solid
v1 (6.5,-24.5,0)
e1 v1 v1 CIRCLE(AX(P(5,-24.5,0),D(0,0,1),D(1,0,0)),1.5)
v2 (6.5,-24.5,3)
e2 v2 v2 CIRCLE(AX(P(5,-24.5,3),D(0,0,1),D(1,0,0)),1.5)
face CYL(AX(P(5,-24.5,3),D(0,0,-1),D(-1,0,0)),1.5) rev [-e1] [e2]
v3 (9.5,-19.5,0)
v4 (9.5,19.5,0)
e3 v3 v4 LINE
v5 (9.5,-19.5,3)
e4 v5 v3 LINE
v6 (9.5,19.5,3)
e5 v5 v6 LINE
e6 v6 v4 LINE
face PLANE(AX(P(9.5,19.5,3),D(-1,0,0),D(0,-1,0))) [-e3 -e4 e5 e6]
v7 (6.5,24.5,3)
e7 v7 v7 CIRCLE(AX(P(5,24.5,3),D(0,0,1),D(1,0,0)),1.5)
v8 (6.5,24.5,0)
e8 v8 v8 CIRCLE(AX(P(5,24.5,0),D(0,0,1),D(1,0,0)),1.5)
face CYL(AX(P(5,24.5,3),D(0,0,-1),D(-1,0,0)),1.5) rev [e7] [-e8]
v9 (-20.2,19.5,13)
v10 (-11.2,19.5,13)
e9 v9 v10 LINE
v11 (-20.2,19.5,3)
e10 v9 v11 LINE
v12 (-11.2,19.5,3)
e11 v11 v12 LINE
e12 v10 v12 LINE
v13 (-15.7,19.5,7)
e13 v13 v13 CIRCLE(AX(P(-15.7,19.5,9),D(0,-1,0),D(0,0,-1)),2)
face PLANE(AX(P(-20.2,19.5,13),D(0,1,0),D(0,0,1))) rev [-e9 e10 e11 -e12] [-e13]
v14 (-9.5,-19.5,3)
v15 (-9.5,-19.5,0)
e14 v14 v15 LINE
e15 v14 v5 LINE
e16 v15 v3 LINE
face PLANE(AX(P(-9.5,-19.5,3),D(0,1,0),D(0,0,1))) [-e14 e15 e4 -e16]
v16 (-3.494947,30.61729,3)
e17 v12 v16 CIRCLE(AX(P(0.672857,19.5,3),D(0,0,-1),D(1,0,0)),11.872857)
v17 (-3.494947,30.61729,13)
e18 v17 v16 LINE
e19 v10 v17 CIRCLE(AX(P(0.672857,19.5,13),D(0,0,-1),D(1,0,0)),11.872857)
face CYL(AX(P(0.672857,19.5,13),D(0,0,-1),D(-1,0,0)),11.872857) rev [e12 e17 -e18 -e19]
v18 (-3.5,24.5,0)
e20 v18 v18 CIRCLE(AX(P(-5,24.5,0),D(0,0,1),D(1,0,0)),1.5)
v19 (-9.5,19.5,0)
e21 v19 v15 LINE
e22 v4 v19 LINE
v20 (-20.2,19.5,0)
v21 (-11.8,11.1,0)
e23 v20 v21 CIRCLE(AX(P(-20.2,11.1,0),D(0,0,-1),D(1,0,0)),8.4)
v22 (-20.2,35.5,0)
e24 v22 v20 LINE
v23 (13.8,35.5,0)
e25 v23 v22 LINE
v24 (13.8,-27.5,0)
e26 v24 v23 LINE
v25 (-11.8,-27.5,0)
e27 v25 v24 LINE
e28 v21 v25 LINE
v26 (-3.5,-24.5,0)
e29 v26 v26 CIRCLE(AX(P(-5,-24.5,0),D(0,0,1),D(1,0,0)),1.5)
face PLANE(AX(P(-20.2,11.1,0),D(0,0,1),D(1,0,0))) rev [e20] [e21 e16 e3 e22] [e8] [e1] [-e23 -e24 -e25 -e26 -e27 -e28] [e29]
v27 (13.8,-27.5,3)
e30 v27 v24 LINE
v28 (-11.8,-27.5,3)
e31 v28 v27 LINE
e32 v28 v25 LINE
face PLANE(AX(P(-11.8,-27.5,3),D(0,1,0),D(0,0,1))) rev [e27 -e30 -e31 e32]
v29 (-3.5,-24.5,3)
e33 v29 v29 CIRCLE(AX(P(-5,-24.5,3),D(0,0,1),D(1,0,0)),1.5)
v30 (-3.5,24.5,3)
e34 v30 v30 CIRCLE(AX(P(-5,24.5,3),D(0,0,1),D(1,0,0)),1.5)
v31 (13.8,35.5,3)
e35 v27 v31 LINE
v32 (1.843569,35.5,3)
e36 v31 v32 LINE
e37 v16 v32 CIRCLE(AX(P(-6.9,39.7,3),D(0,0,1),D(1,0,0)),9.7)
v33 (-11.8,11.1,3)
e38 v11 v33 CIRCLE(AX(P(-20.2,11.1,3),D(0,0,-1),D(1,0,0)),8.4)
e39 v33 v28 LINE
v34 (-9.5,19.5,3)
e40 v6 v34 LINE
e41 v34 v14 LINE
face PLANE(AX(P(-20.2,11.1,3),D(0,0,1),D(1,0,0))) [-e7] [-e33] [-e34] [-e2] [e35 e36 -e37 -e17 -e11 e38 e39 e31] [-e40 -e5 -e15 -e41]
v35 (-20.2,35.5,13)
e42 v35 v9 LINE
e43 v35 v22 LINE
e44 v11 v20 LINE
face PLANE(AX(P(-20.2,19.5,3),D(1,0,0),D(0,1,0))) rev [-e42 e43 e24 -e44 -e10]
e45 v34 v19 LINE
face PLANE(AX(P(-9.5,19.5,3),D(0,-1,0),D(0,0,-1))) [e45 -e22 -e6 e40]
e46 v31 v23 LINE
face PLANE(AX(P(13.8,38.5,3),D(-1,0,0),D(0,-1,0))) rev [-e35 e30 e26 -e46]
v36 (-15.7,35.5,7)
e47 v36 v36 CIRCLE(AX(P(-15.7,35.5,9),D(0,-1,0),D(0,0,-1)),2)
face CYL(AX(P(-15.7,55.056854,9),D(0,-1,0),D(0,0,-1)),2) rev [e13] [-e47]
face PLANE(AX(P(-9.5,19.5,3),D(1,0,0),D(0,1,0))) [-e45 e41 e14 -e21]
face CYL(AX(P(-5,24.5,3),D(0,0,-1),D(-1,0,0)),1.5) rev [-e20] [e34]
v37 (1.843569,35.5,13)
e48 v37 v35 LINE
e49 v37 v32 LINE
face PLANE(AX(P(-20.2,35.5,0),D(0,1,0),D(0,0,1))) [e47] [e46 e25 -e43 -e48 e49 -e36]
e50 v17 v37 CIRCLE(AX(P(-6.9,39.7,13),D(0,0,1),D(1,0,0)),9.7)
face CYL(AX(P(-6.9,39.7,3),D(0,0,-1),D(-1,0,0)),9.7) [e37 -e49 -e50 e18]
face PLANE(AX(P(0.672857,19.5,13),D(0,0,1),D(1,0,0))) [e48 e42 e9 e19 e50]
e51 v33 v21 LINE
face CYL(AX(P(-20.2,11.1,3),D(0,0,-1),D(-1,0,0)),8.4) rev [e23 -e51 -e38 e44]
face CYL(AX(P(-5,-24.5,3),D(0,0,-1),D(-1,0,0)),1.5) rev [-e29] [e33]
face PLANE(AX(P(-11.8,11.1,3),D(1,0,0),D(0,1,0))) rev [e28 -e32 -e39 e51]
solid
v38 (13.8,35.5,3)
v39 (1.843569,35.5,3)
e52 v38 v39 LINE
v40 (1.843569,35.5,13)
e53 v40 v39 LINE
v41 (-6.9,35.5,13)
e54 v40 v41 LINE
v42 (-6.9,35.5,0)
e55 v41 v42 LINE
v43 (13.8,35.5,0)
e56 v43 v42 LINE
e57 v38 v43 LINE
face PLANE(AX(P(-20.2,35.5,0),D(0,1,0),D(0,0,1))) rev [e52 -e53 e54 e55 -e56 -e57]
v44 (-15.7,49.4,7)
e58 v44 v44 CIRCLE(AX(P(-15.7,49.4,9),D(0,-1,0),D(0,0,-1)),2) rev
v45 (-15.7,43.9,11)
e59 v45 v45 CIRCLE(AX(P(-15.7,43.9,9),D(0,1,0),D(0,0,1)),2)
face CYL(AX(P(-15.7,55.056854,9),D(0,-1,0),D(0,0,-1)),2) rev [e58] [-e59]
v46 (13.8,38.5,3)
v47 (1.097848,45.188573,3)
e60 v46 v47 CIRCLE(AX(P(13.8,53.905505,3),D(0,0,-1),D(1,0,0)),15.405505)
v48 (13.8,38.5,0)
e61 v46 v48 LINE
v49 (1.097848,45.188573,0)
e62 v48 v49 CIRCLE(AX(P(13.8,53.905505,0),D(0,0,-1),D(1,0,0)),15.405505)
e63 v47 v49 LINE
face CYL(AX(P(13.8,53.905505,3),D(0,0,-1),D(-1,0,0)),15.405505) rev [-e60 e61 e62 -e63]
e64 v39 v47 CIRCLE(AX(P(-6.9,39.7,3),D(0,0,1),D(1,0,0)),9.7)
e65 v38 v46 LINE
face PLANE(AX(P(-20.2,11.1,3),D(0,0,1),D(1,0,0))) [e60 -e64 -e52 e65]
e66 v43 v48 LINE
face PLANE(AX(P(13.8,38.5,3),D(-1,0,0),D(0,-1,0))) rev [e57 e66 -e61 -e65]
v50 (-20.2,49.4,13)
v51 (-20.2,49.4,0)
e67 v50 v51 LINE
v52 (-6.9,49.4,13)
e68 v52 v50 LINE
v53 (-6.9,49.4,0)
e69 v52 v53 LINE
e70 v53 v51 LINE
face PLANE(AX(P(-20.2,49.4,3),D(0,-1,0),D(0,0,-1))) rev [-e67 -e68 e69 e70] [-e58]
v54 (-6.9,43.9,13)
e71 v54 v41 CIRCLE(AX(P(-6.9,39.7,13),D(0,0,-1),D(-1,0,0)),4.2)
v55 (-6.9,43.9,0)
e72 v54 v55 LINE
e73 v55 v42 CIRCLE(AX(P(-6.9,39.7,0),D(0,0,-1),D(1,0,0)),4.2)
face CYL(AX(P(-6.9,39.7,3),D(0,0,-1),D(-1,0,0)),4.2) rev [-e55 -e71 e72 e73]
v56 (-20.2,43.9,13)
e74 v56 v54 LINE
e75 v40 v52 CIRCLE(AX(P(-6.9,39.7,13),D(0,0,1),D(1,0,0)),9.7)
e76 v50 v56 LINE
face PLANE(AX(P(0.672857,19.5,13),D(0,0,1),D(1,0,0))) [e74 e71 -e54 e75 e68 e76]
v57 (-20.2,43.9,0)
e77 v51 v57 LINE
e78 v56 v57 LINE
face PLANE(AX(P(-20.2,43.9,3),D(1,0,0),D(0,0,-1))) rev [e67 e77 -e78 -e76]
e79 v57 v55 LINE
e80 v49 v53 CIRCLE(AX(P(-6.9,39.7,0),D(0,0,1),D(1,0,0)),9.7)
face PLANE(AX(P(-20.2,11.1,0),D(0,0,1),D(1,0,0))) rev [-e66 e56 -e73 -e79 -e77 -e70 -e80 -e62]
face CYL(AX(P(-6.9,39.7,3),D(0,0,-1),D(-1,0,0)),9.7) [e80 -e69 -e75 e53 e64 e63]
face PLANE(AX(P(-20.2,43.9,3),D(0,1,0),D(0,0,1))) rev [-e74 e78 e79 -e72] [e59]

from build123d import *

# Parameters (mm, degrees)
SKETCH_1_R             = 1.5
SKETCH_1_W             = 19
SKETCH_1_H             = 39
EXTRUDE_894_DEPTH      = 3
EXTRUDE_1415_DEPTH     = 10
CUT_EXTRUDE_1608_REACH = 54.783
SKETCH_3_R             = 2


# Read off the part's stored shape, not the designer's step: Разделить1
with BuildPart() as part:
    # Эскиз1 → Extrude 894 (new body)
    with BuildSketch(Plane.XY):
        with BuildLine():
            Line((-20.2, 19.5), (-20.2, 35.5))
            Line((-20.2, 35.5), (-6.9, 35.5))
            ThreePointArc((-6.9, 35.5), (-2.7, 39.7), (-6.9, 43.9))
            Line((-6.9, 43.9), (-20.2, 43.9))
            Line((-20.2, 43.9), (-20.2, 49.4))
            Line((-20.2, 49.4), (-6.9, 49.4))
            ThreePointArc((-6.9, 49.4), (-2.380550811, 48.282807176), (1.097847616, 45.188572995))
            ThreePointArc((1.097847616, 45.188572995), (6.622227297, 40.274321564), (13.8, 38.5))
            Line((13.8, 38.5), (13.8, -27.5))
            Line((13.8, -27.5), (-11.8, -27.5))
            Line((-11.8, -27.5), (-11.8, 11.1))
            ThreePointArc((-11.8, 11.1), (-14.260303038, 17.039696962), (-20.2, 19.5))
        make_face()
        with Locations((-5, 24.5)):
            Circle(SKETCH_1_R, mode=Mode.SUBTRACT)
        with Locations((5, 24.5)):
            Circle(SKETCH_1_R, mode=Mode.SUBTRACT)
        with Locations((-5, -24.5)):
            Circle(SKETCH_1_R, mode=Mode.SUBTRACT)
        with Locations((5, -24.5)):
            Circle(SKETCH_1_R, mode=Mode.SUBTRACT)
        Rectangle(SKETCH_1_W, SKETCH_1_H, mode=Mode.SUBTRACT)
    extrude(amount=EXTRUDE_894_DEPTH)

    # Эскиз2 → Extrude 1415 (add)
    with BuildSketch(Plane.XY.offset(3)):
        with BuildLine():
            Line((-20.2, 19.5), (-20.2, 35.5))
            Line((-20.2, 35.5), (-6.9, 35.5))
            ThreePointArc((-6.9, 35.5), (-2.7, 39.7), (-6.9, 43.9))
            Line((-6.9, 43.9), (-20.2, 43.9))
            Line((-20.2, 43.9), (-20.2, 49.4))
            Line((-20.2, 49.4), (-6.9, 49.4))
            ThreePointArc((-6.9, 49.4), (2.64442991, 41.430276767), (-3.494947354, 30.617290246))
            ThreePointArc((-3.494947354, 30.617290246), (-9.085433797, 26.263171938), (-11.2, 19.5))
            Line((-11.2, 19.5), (-20.2, 19.5))
        make_face()
    extrude(amount=EXTRUDE_1415_DEPTH)

    # Cut-Extrude 1608: up to this face of the body (flat: up to its plane)
    cut_extrude_1608_end = Plane(part.part.faces().sort_by_distance((-13.55, 49.4, 6.5))[0])
    # Эскиз3 → Cut-Extrude 1608 (cut, up to the picked face)
    with BuildSketch(Plane.XZ.offset(-19.5), mode=Mode.PRIVATE) as cut_extrude_1608_sk1:
        with Locations(Location((-15.7, 9, 0), (0, 0, 270))):
            Circle(SKETCH_3_R)
    cut_extrude_1608_tool1 = split(extrude(cut_extrude_1608_sk1.sketch, amount=-CUT_EXTRUDE_1608_REACH, mode=Mode.PRIVATE), bisect_by=cut_extrude_1608_end, keep=Keep.BOTH, mode=Mode.PRIVATE)
    add(cut_extrude_1608_tool1.solids().sort_by(Axis((-15.7, 19.5, 9), (0, 1, 0)))[0], mode=Mode.SUBTRACT)


with BuildPart() as body_2:
    # Split Bodies 1: the piece on the far side of the plane
    add(part.part)
    split(bisect_by=Plane(origin=(0, 35.5, 0), x_dir=(1, 0, 0), z_dir=(0, 1, 0)), keep=Keep.BOTTOM)


with BuildPart() as part_1:
    add(part.part)

    # Split Bodies 1
    split(bisect_by=Plane(origin=(0, 35.5, 0), x_dir=(1, 0, 0), z_dir=(0, 1, 0)), keep=Keep.TOP)


solid = Compound([body_2.part, part_1.part])
